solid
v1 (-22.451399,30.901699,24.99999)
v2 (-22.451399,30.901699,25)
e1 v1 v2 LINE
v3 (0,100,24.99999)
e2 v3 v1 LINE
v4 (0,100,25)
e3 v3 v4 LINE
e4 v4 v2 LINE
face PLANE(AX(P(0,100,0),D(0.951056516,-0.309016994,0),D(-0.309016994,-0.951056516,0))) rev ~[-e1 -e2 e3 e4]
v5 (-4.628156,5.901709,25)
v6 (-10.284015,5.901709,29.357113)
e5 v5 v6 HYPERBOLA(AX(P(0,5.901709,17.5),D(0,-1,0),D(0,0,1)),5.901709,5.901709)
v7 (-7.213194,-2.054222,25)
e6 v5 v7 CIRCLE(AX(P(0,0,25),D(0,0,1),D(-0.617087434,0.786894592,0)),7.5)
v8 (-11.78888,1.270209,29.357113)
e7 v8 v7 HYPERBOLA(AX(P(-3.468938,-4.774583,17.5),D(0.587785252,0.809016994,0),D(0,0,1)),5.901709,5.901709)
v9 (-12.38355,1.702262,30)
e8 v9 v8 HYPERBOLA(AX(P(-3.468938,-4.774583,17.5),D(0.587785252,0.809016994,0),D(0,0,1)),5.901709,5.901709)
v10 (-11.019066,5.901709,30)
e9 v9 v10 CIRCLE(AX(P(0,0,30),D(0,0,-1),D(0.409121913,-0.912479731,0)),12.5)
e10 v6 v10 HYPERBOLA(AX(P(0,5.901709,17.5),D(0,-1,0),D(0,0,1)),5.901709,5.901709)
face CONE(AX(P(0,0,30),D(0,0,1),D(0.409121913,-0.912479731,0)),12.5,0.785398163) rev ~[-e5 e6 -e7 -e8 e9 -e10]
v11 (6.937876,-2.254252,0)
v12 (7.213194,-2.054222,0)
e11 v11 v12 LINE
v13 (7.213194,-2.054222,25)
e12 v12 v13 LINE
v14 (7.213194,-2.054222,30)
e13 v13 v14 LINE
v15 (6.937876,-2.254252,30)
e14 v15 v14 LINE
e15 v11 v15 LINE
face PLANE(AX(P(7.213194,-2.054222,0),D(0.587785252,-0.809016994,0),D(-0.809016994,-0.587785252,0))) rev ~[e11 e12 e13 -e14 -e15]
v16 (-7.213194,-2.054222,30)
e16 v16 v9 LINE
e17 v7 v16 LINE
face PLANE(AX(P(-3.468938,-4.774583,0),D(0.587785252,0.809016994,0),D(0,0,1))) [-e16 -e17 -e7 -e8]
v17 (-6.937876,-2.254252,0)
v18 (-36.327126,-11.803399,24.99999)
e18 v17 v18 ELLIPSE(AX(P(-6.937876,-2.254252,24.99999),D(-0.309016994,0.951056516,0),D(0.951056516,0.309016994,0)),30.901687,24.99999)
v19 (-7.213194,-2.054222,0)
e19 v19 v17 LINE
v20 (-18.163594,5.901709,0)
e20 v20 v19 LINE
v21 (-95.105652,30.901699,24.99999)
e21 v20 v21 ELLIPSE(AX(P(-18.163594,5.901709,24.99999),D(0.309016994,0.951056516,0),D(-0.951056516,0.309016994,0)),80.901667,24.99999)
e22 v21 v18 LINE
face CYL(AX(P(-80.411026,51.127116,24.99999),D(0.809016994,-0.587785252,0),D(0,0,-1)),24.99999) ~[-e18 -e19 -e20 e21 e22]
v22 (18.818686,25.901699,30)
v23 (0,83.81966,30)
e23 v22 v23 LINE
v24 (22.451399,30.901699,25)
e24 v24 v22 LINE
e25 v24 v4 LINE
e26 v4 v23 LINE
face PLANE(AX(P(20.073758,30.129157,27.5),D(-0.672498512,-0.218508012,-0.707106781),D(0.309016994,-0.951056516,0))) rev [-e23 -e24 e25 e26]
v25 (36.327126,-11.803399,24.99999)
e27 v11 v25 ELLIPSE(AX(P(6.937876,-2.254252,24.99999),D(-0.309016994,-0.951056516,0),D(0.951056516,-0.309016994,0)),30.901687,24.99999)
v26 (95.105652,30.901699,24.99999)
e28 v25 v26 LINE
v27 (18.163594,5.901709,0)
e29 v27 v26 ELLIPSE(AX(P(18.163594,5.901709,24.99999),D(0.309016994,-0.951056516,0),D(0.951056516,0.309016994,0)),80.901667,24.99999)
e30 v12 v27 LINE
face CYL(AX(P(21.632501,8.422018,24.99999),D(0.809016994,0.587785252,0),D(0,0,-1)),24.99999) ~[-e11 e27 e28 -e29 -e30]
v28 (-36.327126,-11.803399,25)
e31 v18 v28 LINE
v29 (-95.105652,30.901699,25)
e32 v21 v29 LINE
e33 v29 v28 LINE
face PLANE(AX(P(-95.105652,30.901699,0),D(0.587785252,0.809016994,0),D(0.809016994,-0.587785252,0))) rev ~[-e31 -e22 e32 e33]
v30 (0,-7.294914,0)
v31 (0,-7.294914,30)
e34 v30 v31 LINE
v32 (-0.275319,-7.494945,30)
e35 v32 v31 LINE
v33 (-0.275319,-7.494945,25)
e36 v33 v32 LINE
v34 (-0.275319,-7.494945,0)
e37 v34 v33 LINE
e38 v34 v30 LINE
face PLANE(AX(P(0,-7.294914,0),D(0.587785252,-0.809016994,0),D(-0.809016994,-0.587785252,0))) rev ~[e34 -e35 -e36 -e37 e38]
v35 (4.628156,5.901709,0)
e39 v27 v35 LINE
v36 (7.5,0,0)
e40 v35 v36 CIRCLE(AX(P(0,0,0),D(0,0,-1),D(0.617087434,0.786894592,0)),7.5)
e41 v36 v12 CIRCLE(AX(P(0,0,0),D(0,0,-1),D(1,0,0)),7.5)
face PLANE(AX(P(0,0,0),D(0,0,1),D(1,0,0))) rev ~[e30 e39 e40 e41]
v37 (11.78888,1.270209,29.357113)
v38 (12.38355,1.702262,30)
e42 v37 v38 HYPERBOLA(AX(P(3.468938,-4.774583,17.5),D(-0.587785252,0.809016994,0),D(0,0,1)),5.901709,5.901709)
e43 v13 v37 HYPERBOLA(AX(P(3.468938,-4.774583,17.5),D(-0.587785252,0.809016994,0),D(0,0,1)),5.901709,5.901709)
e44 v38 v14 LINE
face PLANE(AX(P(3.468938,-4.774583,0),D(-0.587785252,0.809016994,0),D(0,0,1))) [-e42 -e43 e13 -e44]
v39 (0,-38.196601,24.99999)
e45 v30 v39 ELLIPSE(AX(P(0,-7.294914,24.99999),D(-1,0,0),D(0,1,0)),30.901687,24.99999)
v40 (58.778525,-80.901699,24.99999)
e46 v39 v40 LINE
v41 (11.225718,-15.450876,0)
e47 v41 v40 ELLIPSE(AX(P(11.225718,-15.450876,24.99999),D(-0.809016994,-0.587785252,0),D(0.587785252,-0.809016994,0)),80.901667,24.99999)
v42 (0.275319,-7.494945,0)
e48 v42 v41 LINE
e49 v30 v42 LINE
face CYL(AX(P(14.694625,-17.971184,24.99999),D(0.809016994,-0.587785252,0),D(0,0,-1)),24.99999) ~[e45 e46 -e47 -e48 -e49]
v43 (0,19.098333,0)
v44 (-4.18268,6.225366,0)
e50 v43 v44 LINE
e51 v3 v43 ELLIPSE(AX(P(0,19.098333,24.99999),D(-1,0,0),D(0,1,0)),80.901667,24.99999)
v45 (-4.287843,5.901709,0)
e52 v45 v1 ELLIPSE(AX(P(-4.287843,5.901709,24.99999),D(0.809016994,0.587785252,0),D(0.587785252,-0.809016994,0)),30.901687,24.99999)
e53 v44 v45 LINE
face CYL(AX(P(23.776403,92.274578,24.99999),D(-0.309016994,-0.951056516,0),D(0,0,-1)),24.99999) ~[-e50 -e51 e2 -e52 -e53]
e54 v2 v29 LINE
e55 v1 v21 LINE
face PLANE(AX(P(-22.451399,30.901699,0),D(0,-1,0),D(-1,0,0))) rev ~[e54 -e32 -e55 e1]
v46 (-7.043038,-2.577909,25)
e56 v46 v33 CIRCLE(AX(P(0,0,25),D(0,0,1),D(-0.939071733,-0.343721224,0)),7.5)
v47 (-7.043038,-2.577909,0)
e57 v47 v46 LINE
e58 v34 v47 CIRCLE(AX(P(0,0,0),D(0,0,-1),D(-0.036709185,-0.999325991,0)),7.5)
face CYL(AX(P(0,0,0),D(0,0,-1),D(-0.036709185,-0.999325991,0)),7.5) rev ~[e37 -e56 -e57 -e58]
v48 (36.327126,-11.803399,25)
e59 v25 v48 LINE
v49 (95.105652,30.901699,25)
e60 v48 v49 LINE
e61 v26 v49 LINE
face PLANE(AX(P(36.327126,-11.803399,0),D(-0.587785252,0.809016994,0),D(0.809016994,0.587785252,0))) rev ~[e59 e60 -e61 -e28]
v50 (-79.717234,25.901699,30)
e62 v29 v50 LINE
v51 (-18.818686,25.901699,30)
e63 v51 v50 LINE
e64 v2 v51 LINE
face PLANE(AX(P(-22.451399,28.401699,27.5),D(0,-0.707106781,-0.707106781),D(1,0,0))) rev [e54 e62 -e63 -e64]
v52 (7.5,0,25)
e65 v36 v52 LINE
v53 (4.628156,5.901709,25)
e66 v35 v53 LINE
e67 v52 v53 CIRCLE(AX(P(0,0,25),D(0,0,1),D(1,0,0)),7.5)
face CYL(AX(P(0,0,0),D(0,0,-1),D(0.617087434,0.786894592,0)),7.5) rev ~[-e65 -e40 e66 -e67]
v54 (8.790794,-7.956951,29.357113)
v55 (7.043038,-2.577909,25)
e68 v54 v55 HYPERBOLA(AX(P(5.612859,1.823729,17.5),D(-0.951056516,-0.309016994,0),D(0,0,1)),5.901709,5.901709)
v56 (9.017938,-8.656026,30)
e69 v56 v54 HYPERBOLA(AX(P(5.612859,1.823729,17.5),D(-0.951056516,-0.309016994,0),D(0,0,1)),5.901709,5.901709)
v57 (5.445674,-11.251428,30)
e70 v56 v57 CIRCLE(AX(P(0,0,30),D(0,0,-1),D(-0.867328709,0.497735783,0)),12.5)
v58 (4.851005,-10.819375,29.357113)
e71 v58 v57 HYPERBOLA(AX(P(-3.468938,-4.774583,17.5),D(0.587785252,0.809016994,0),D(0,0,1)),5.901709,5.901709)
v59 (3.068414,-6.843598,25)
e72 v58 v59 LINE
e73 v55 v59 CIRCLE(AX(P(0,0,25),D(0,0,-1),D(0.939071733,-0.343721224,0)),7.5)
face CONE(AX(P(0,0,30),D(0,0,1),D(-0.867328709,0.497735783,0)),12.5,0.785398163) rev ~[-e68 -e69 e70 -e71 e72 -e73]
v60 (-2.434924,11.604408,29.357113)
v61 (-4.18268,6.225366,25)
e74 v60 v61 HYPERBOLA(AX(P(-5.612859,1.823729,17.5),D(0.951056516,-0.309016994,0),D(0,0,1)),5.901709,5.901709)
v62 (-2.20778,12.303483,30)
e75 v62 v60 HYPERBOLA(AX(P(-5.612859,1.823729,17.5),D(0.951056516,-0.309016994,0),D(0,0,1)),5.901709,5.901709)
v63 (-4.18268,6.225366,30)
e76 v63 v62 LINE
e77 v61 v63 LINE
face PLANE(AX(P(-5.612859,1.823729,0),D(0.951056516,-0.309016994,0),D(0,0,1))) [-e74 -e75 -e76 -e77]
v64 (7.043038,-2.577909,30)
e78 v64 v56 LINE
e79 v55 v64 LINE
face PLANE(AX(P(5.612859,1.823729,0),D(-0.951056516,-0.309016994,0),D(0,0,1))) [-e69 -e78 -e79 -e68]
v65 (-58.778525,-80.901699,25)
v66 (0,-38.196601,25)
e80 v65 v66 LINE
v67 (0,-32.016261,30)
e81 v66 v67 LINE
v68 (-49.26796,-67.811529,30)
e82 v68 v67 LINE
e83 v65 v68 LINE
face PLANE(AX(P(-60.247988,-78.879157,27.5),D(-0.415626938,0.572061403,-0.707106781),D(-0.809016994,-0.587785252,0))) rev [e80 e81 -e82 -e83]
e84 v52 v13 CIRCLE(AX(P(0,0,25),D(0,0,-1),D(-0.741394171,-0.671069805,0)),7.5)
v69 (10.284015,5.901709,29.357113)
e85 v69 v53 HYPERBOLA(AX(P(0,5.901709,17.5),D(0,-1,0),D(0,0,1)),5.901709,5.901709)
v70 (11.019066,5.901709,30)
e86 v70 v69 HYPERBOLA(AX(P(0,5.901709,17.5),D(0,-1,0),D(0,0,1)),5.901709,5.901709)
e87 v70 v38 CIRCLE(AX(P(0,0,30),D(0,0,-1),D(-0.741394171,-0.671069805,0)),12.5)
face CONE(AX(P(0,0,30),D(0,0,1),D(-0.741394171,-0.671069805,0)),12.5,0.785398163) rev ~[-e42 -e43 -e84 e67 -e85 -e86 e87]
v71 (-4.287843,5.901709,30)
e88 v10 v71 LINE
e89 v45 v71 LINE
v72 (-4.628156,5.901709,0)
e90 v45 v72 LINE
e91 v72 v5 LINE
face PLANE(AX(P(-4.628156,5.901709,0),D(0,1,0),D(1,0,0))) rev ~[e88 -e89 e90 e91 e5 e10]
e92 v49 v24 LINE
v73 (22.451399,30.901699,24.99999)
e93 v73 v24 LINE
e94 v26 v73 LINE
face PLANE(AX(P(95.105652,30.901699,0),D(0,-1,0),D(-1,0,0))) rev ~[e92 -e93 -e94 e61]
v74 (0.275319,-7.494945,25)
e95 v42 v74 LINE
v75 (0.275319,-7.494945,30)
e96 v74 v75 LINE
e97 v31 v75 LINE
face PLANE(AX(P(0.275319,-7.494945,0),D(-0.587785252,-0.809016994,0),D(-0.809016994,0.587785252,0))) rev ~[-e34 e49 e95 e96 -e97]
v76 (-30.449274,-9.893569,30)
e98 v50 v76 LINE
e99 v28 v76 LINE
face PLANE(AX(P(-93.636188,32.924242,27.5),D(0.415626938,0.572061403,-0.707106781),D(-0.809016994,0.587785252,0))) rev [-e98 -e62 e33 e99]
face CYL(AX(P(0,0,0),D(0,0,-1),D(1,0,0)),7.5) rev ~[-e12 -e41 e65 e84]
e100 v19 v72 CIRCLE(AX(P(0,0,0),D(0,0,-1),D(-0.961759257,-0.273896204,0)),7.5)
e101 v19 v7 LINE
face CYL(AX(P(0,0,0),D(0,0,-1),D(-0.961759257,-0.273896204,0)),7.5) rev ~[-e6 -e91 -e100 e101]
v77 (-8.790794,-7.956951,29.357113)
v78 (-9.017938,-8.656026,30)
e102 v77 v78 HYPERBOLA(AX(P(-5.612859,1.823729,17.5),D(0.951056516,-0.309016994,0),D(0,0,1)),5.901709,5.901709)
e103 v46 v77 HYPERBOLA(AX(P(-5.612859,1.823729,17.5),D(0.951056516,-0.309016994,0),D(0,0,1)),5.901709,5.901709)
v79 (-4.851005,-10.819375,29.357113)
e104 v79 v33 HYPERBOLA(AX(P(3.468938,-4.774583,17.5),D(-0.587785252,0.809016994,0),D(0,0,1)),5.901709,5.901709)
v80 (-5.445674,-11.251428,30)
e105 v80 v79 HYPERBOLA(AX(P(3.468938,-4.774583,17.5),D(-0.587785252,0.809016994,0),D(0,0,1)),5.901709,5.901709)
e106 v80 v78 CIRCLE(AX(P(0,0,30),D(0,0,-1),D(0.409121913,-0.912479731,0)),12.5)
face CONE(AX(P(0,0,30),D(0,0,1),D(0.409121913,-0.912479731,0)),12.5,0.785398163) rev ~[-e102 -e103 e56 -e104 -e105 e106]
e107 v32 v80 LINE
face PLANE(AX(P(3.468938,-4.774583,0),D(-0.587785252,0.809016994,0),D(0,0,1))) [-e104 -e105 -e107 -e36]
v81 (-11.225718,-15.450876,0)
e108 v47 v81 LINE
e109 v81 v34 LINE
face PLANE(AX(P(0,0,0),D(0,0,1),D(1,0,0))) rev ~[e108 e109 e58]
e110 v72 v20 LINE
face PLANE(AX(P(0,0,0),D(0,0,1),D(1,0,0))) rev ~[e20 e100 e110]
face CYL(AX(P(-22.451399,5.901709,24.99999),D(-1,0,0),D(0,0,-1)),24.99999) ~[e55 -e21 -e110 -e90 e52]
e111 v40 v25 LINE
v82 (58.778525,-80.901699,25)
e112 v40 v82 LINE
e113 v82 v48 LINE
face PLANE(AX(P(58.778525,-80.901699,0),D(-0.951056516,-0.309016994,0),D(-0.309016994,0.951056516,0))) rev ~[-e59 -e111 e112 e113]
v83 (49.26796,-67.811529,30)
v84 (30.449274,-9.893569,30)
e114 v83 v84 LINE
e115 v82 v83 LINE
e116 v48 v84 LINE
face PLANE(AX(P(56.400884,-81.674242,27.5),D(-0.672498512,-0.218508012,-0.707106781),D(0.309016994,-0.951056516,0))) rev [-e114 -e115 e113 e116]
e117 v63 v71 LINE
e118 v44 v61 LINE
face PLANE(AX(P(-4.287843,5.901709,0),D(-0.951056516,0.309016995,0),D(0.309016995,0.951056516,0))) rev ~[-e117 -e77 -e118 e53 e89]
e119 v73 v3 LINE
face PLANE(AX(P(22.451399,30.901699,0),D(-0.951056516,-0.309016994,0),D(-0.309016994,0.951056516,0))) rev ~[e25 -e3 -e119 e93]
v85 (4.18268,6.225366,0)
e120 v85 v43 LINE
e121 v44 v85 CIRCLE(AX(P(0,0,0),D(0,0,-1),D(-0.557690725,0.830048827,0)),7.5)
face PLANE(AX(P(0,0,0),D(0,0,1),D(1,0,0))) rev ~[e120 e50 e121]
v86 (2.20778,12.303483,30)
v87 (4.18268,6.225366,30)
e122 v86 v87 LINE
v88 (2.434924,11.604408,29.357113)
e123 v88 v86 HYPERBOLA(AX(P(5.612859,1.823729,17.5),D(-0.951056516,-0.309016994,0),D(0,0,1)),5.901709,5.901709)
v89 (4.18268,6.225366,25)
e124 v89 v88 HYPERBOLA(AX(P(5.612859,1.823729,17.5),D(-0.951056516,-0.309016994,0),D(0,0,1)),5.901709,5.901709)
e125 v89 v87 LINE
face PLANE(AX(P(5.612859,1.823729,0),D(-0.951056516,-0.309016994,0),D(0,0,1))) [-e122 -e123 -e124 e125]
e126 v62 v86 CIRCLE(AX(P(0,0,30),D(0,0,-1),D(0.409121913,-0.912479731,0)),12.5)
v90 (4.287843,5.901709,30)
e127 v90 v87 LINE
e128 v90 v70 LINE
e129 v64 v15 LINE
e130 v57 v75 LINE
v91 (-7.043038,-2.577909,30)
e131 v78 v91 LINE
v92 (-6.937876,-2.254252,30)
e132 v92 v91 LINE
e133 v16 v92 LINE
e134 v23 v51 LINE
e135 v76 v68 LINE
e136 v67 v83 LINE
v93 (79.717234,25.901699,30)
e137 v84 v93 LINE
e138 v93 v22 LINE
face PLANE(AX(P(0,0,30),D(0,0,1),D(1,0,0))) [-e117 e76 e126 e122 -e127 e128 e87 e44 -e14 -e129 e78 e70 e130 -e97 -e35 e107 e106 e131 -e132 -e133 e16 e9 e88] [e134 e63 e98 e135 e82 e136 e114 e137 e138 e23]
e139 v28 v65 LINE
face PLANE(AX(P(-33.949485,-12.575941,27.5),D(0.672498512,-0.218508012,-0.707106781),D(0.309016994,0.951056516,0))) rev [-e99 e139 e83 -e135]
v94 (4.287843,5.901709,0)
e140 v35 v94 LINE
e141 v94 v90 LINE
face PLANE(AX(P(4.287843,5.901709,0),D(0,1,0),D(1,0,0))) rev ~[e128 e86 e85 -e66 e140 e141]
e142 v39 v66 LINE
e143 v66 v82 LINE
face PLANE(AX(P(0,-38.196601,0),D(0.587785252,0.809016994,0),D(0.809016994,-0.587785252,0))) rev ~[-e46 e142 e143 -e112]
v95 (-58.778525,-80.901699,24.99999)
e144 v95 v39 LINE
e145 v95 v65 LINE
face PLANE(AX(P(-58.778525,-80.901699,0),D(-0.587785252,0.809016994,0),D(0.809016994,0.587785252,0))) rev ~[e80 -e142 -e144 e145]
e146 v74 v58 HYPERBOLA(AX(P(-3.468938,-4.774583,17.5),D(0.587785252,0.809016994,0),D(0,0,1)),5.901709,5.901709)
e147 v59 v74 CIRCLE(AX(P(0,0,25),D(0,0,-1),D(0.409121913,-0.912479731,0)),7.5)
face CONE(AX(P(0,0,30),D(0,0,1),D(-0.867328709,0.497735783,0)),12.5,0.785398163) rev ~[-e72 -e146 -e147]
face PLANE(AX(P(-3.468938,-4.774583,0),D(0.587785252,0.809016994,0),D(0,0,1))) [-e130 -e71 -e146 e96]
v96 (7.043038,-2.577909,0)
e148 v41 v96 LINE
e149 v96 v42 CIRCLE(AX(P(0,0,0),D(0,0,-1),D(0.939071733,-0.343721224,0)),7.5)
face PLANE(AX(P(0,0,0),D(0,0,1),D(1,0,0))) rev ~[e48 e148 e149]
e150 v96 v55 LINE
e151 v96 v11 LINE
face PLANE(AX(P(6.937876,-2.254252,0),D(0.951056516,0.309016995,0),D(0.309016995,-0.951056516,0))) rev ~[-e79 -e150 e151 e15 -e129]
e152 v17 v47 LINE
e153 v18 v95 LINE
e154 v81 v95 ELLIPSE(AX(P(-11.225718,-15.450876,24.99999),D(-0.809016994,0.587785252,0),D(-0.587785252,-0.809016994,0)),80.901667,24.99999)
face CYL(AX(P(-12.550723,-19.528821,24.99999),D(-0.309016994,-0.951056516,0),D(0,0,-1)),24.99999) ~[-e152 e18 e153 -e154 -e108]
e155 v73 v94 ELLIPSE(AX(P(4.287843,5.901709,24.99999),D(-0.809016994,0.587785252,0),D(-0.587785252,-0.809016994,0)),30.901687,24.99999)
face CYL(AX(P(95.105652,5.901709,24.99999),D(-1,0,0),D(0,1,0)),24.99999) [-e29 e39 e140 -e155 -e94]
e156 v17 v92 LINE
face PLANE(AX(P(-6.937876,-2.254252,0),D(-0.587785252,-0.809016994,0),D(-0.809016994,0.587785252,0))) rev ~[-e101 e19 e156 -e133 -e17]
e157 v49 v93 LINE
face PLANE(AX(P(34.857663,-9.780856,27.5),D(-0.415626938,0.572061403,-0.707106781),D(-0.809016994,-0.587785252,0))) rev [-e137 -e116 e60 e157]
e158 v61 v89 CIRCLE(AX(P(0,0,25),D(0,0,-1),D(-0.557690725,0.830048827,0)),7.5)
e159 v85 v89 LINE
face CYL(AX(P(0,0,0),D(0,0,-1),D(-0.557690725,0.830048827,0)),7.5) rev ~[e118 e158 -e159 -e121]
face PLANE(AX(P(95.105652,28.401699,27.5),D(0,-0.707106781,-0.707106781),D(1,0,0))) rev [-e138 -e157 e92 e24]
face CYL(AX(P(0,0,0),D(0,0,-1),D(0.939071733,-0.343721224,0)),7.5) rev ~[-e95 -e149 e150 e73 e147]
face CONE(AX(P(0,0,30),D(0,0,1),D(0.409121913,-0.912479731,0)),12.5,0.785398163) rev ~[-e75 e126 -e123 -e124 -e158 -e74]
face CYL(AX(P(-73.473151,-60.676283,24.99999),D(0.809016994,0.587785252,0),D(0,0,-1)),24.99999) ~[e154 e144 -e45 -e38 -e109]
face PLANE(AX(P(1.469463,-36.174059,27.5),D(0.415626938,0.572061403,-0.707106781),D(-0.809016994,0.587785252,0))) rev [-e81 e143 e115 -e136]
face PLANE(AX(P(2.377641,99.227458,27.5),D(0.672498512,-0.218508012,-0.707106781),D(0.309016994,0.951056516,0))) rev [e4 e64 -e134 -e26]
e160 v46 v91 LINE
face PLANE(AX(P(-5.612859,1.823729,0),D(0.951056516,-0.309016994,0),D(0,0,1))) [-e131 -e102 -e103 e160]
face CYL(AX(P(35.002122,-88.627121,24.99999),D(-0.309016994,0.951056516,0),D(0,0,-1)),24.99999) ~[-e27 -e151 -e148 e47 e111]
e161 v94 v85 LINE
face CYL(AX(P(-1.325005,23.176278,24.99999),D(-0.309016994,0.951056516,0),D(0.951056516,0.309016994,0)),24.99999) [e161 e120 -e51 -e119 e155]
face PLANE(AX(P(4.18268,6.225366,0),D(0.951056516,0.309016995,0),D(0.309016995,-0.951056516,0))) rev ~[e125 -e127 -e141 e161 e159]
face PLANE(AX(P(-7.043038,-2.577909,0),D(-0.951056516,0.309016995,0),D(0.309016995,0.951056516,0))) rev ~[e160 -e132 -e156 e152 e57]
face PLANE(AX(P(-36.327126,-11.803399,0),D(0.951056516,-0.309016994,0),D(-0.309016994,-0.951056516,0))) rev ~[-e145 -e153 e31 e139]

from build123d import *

# Parameters (mm, degrees)
F1_DEPTH     = 30
F2_SIZE      = 5
F3_R         = 24.99999
F5_DEPTH     = 35
F6_T4_ANGLE  = 264.2993733481
F6_T11_ANGLE = 264.2993733481
F6_T18_ANGLE = 264.2993733481
F6_T24_ANGLE = 264.2993733481
F6_T30_ANGLE = 264.2993733481
F6_T37_ANGLE = 264.2993733481
F6_T44_ANGLE = 264.2993733481
F6_T51_ANGLE = 264.2993733481
F6_T57_ANGLE = 264.2993733481
F6_T63_ANGLE = 264.2993733481
F6_T70_ANGLE = 264.299373348
F6_T77_ANGLE = 264.299373348
F6_T84_ANGLE = 264.299373348


# Not quite as in the source:
# - a fillet or chamfer that OpenCascade refuses, or shapes differently, is made with other operations: its cross-section is extruded or revolved along the edge and cut away or added
# - a fillet or chamfer is up to 0.001 mm smaller than in the source, because OpenCascade refuses the exact size


with BuildPart() as f1:
    # F0 (on Top) → F1 (new body)
    with BuildSketch(Plane.XY):
        Polygon((22.451398829, 30.9016994375), (0, 100), (-22.451398829, 30.9016994375), (-95.1056516295, 30.9016994375), (-36.3271264003, -11.803398875), (-58.7785252292, -80.9016994375), (0, -38.196601125), (58.7785252292, -80.9016994375), (36.3271264003, -11.803398875), (95.1056516295, 30.9016994375), align=None)
    extrude(amount=F1_DEPTH)

    # F2
    f2_edges = [f1.edges().sort_by_distance(p)[0] for p in [
        (65.716389, 9.54915, 30),
        (58.778525, 30.901699, 30),
        (11.225699, 65.45085, 30),
        (-11.225699, 65.45085, 30),
        (-58.778525, 30.901699, 30),
        (-65.716389, 9.54915, 30),
        (-47.552826, -46.352549, 30),
        (-29.389263, -59.54915, 30),
        (29.389263, -59.54915, 30),
        (47.552826, -46.352549, 30),
    ]]
    chamfer(f2_edges, length=F2_SIZE)

    # F3 (radius 25 in the source; OpenCascade refuses exactly that, so slightly less here)
    f3_edges = [f1.edges().sort_by_distance(p)[0] for p in [
        (65.716389, 9.54915, 0),
        (58.778525, 30.901699, 0),
        (11.225699, 65.45085, 0),
        (-11.225699, 65.45085, 0),
        (-58.778525, 30.901699, 0),
        (-65.716389, 9.54915, 0),
        (-47.552826, -46.352549, 0),
        (-29.389263, -59.54915, 0),
        (29.389263, -59.54915, 0),
        (47.552826, -46.352549, 0),
    ]]
    fillet(f3_edges, radius=F3_R)

    # F4 (on face) → F5 (cut)
    with BuildSketch(Plane(origin=(0, 0, 0), x_dir=(1, 0, 0), z_dir=(0, 0, -1))):
        with BuildLine():
            ThreePointArc((4.6281557575, -5.9017094375), (6.7439294251, -3.2816788249), (7.5, 0))
            ThreePointArc((7.5, 0), (7.4279525521, 1.0370732295), (7.2131944311, 2.0542215312))
            Line((7.2131944311, 2.0542215312), (6.9378755413, 2.2542524134))
            Line((6.9378755413, 2.2542524134), (7.0430379995, 2.5779091795))
            ThreePointArc((7.0430379995, 2.5779091795), (4.4083893922, 6.0676274578), (0.2753188897, 7.4949449303))
            Line((0.2753188897, 7.4949449303), (0, 7.2949140482))
            Line((0, 7.2949140482), (-0.2753188897, 7.4949449303))
            ThreePointArc((-0.2753188897, 7.4949449303), (-4.4083893922, 6.0676274578), (-7.0430379995, 2.5779091795))
            Line((-7.0430379995, 2.5779091795), (-6.9378755413, 2.2542524134))
            Line((-6.9378755413, 2.2542524134), (-7.2131944311, 2.0542215312))
            ThreePointArc((-7.2131944311, 2.0542215312), (-7.1329238722, -2.3176274578), (-4.6281557575, -5.9017094375))
            Line((-4.6281557575, -5.9017094375), (-4.2878428943, -5.9017094375))
            Line((-4.2878428943, -5.9017094375), (-4.1826804361, -6.2253662036))
            ThreePointArc((-4.1826804361, -6.2253662036), (0, -7.5), (4.1826804361, -6.2253662036))
            Line((4.1826804361, -6.2253662036), (4.2878428943, -5.9017094375))
            Line((4.2878428943, -5.9017094375), (4.6281557575, -5.9017094375))
        make_face()
    extrude(amount=-F5_DEPTH, mode=Mode.SUBTRACT)

    # F6: chamfer of 5 on 5 edges, made by hand


with BuildPart() as f6_tool2:
    # F6_s3 → F6_t4 (revolve)
    with BuildSketch(Plane(origin=(0, 0, 0), x_dir=(0, 0, 1), z_dir=(0.9124797315, 0.4091219129, 0))):
        Polygon((30, 12.5), (25, 7.5), (30, 7.5), align=None)
    revolve(axis=Axis((0, 0, 30), (0, 0, -1)), revolution_arc=F6_T4_ANGLE)

    split(bisect_by=Plane(origin=(-5.6128592178, 1.823728512, 0), x_dir=(0, 0, 1), z_dir=(0.9510565163, -0.3090169944, 0)), keep=Keep.TOP)

    split(bisect_by=Plane(origin=(-3.4689377707, -4.7745832308, 0), x_dir=(0, 0, 1), z_dir=(0.5877852523, 0.8090169944, 0)), keep=Keep.TOP)

    split(bisect_by=Plane(origin=(5.6128592178, 1.823728512, 0), x_dir=(0, 0, 1), z_dir=(-0.9510565163, -0.3090169944, 0)), keep=Keep.TOP)


with BuildPart() as f1_1:
    add(f1.part)

    # F6_t1: cut F6_tool2
    add(f6_tool2.part, mode=Mode.SUBTRACT)


with BuildPart() as f6_tool9:
    # F6_s10 → F6_t11 (revolve)
    with BuildSketch(Plane(origin=(0, 0, 0), x_dir=(0, 0, 1), z_dir=(0.9124797315, 0.4091219129, 0))):
        Polygon((30, 12.5), (25, 7.5), (30, 7.5), align=None)
    revolve(axis=Axis((0, 0, 30), (0, 0, -1)), revolution_arc=F6_T11_ANGLE)

    split(bisect_by=Plane.XZ.offset(-5.9017094375), keep=Keep.TOP)

    split(bisect_by=Plane(origin=(-5.6128592178, 1.823728512, 0), x_dir=(0, 0, 1), z_dir=(0.9510565163, -0.3090169944, 0)), keep=Keep.TOP)

    split(bisect_by=Plane(origin=(3.4689377707, -4.7745832308, 0), x_dir=(0, 0, 1), z_dir=(-0.5877852523, 0.8090169944, 0)), keep=Keep.TOP)


with BuildPart() as f1_2:
    add(f1_1.part)

    # F6_t8: cut F6_tool9
    add(f6_tool9.part, mode=Mode.SUBTRACT)


with BuildPart() as f6_tool16:
    # F6_s17 → F6_t18 (revolve)
    with BuildSketch(Plane(origin=(0, 0, 0), x_dir=(0, 0, 1), z_dir=(0.9124797315, 0.4091219129, 0))):
        Polygon((30, 12.5), (25, 7.5), (30, 7.5), align=None)
    revolve(axis=Axis((0, 0, 30), (0, 0, -1)), revolution_arc=F6_T18_ANGLE)

    split(bisect_by=Plane.XZ.offset(-5.9017094375), keep=Keep.TOP)

    split(bisect_by=Plane(origin=(-3.4689377707, -4.7745832308, 0), x_dir=(0, 0, 1), z_dir=(0.5877852523, 0.8090169944, 0)), keep=Keep.TOP)


with BuildPart() as f1_3:
    add(f1_2.part)

    # F6_t15: cut F6_tool16
    add(f6_tool16.part, mode=Mode.SUBTRACT)


with BuildPart() as f6_tool22:
    # F6_s23 → F6_t24 (revolve)
    with BuildSketch(Plane(origin=(0, 0, 0), x_dir=(0, 0, 1), z_dir=(0.6710698053, -0.7413941707, 0))):
        Polygon((30, 12.5), (25, 7.5), (30, 7.5), align=None)
    revolve(axis=Axis((0, 0, 30), (0, 0, -1)), revolution_arc=F6_T24_ANGLE)

    split(bisect_by=Plane(origin=(5.6128592178, 1.823728512, 0), x_dir=(0, 0, 1), z_dir=(-0.9510565163, -0.3090169944, 0)), keep=Keep.TOP)

    split(bisect_by=Plane(origin=(-5.6128592178, 1.823728512, 0), x_dir=(0, 0, 1), z_dir=(0.9510565163, -0.3090169944, 0)), keep=Keep.TOP)


with BuildPart() as f1_4:
    add(f1_3.part)

    # F6_t21: cut F6_tool22
    add(f6_tool22.part, mode=Mode.SUBTRACT)


with BuildPart() as f6_tool28:
    # F6_s29 → F6_t30 (revolve)
    with BuildSketch(Plane(origin=(0, 0, 0), x_dir=(0, 0, 1), z_dir=(0.6710698053, -0.7413941707, 0))):
        Polygon((30, 12.5), (25, 7.5), (30, 7.5), align=None)
    revolve(axis=Axis((0, 0, 30), (0, 0, -1)), revolution_arc=F6_T30_ANGLE)

    split(bisect_by=Plane(origin=(3.4689377707, -4.7745832308, 0), x_dir=(0, 0, 1), z_dir=(-0.5877852523, 0.8090169944, 0)), keep=Keep.TOP)

    split(bisect_by=Plane.XZ.offset(-5.9017094375), keep=Keep.TOP)

    split(bisect_by=Plane(origin=(-3.4689377707, -4.7745832308, 0), x_dir=(0, 0, 1), z_dir=(0.5877852523, 0.8090169944, 0)), keep=Keep.TOP)


with BuildPart() as f1_5:
    add(f1_4.part)

    # F6_t27: cut F6_tool28
    add(f6_tool28.part, mode=Mode.SUBTRACT)


with BuildPart() as f6_tool35:
    # F6_s36 → F6_t37 (revolve)
    with BuildSketch(Plane(origin=(0, 0, 0), x_dir=(0, 0, 1), z_dir=(-0.497735783, -0.8673287095, 0))):
        Polygon((30, 12.5), (25, 7.5), (30, 7.5), align=None)
    revolve(axis=Axis((0, 0, 30), (0, 0, -1)), revolution_arc=F6_T37_ANGLE)

    split(bisect_by=Plane(origin=(5.6128592178, 1.823728512, 0), x_dir=(0, 0, 1), z_dir=(-0.9510565163, -0.3090169944, 0)), keep=Keep.TOP)

    split(bisect_by=Plane.XZ.offset(-5.9017094375), keep=Keep.TOP)

    split(bisect_by=Plane(origin=(-3.4689377707, -4.7745832308, 0), x_dir=(0, 0, 1), z_dir=(0.5877852523, 0.8090169944, 0)), keep=Keep.TOP)


with BuildPart() as f1_6:
    add(f1_5.part)

    # F6_t34: cut F6_tool35
    add(f6_tool35.part, mode=Mode.SUBTRACT)


with BuildPart() as f6_tool42:
    # F6_s43 → F6_t44 (revolve)
    with BuildSketch(Plane(origin=(0, 0, 0), x_dir=(0, 0, 1), z_dir=(-0.497735783, -0.8673287095, 0))):
        Polygon((30, 12.5), (25, 7.5), (30, 7.5), align=None)
    revolve(axis=Axis((0, 0, 30), (0, 0, -1)), revolution_arc=F6_T44_ANGLE)

    split(bisect_by=Plane(origin=(3.4689377707, -4.7745832308, 0), x_dir=(0, 0, 1), z_dir=(-0.5877852523, 0.8090169944, 0)), keep=Keep.TOP)

    split(bisect_by=Plane(origin=(5.6128592178, 1.823728512, 0), x_dir=(0, 0, 1), z_dir=(-0.9510565163, -0.3090169944, 0)), keep=Keep.TOP)

    split(bisect_by=Plane(origin=(-5.6128592178, 1.823728512, 0), x_dir=(0, 0, 1), z_dir=(0.9510565163, -0.3090169944, 0)), keep=Keep.TOP)


with BuildPart() as f1_7:
    add(f1_6.part)

    # F6_t41: cut F6_tool42
    add(f6_tool42.part, mode=Mode.SUBTRACT)


with BuildPart() as f6_tool49:
    # F6_s50 → F6_t51 (revolve)
    with BuildSketch(Plane(origin=(0, 0, 0), x_dir=(0, 0, 1), z_dir=(-0.497735783, -0.8673287095, 0))):
        Polygon((30, 12.5), (25, 7.5), (30, 7.5), align=None)
    revolve(axis=Axis((0, 0, 30), (0, 0, -1)), revolution_arc=F6_T51_ANGLE)

    split(bisect_by=Plane(origin=(3.4689377707, -4.7745832308, 0), x_dir=(0, 0, 1), z_dir=(-0.5877852523, 0.8090169944, 0)), keep=Keep.TOP)

    split(bisect_by=Plane.XZ.offset(-5.9017094375), keep=Keep.TOP)


with BuildPart() as f1_8:
    add(f1_7.part)

    # F6_t48: cut F6_tool49
    add(f6_tool49.part, mode=Mode.SUBTRACT)


with BuildPart() as f6_tool55:
    # F6_s56 → F6_t57 (revolve)
    with BuildSketch(Plane(origin=(0, 0, 0), x_dir=(0, 0, 1), z_dir=(-0.9786874366, 0.2053555488, 0))):
        Polygon((30, 12.5), (25, 7.5), (30, 7.5), align=None)
    revolve(axis=Axis((0, 0, 30), (0, 0, -1)), revolution_arc=F6_T57_ANGLE)

    split(bisect_by=Plane(origin=(5.6128592178, 1.823728512, 0), x_dir=(0, 0, 1), z_dir=(-0.9510565163, -0.3090169944, 0)), keep=Keep.TOP)

    split(bisect_by=Plane(origin=(-3.4689377707, -4.7745832308, 0), x_dir=(0, 0, 1), z_dir=(0.5877852523, 0.8090169944, 0)), keep=Keep.TOP)


with BuildPart() as f1_9:
    add(f1_8.part)

    # F6_t54: cut F6_tool55
    add(f6_tool55.part, mode=Mode.SUBTRACT)


with BuildPart() as f6_tool61:
    # F6_s62 → F6_t63 (revolve)
    with BuildSketch(Plane(origin=(0, 0, 0), x_dir=(0, 0, 1), z_dir=(-0.9786874366, 0.2053555488, 0))):
        Polygon((30, 12.5), (25, 7.5), (30, 7.5), align=None)
    revolve(axis=Axis((0, 0, 30), (0, 0, -1)), revolution_arc=F6_T63_ANGLE)

    split(bisect_by=Plane(origin=(3.4689377707, -4.7745832308, 0), x_dir=(0, 0, 1), z_dir=(-0.5877852523, 0.8090169944, 0)), keep=Keep.TOP)

    split(bisect_by=Plane.XZ.offset(-5.9017094375), keep=Keep.TOP)

    split(bisect_by=Plane(origin=(-5.6128592178, 1.823728512, 0), x_dir=(0, 0, 1), z_dir=(0.9510565163, -0.3090169944, 0)), keep=Keep.TOP)


with BuildPart() as f1_10:
    add(f1_9.part)

    # F6_t60: cut F6_tool61
    add(f6_tool61.part, mode=Mode.SUBTRACT)


with BuildPart() as f6_tool68:
    # F6_s69 → F6_t70 (revolve)
    with BuildSketch(Plane(origin=(0, 0, 0), x_dir=(0, 0, 1), z_dir=(-0.1071263172, 0.9942454185, 0))):
        Polygon((30, 12.5), (25, 7.5), (30, 7.5), align=None)
    revolve(axis=Axis((0, 0, 30), (0, 0, -1)), revolution_arc=F6_T70_ANGLE)

    split(bisect_by=Plane(origin=(3.4689377707, -4.7745832308, 0), x_dir=(0, 0, 1), z_dir=(-0.5877852523, 0.8090169944, 0)), keep=Keep.TOP)

    split(bisect_by=Plane(origin=(-3.4689377707, -4.7745832308, 0), x_dir=(0, 0, 1), z_dir=(0.5877852523, 0.8090169944, 0)), keep=Keep.TOP)

    split(bisect_by=Plane.XZ.offset(-5.9017094375), keep=Keep.TOP)


with BuildPart() as f1_11:
    add(f1_10.part)

    # F6_t67: cut F6_tool68
    add(f6_tool68.part, mode=Mode.SUBTRACT)


with BuildPart() as f6_tool75:
    # F6_s76 → F6_t77 (revolve)
    with BuildSketch(Plane(origin=(0, 0, 0), x_dir=(0, 0, 1), z_dir=(-0.1071263172, 0.9942454185, 0))):
        Polygon((30, 12.5), (25, 7.5), (30, 7.5), align=None)
    revolve(axis=Axis((0, 0, 30), (0, 0, -1)), revolution_arc=F6_T77_ANGLE)

    split(bisect_by=Plane(origin=(5.6128592178, 1.823728512, 0), x_dir=(0, 0, 1), z_dir=(-0.9510565163, -0.3090169944, 0)), keep=Keep.TOP)

    split(bisect_by=Plane(origin=(-5.6128592178, 1.823728512, 0), x_dir=(0, 0, 1), z_dir=(0.9510565163, -0.3090169944, 0)), keep=Keep.TOP)

    split(bisect_by=Plane(origin=(-3.4689377707, -4.7745832308, 0), x_dir=(0, 0, 1), z_dir=(0.5877852523, 0.8090169944, 0)), keep=Keep.TOP)


with BuildPart() as f1_12:
    add(f1_11.part)

    # F6_t74: cut F6_tool75
    add(f6_tool75.part, mode=Mode.SUBTRACT)


with BuildPart() as f6_tool82:
    # F6_s83 → F6_t84 (revolve)
    with BuildSketch(Plane(origin=(0, 0, 0), x_dir=(0, 0, 1), z_dir=(-0.1071263172, 0.9942454185, 0))):
        Polygon((30, 12.5), (25, 7.5), (30, 7.5), align=None)
    revolve(axis=Axis((0, 0, 30), (0, 0, -1)), revolution_arc=F6_T84_ANGLE)

    split(bisect_by=Plane(origin=(3.4689377707, -4.7745832308, 0), x_dir=(0, 0, 1), z_dir=(-0.5877852523, 0.8090169944, 0)), keep=Keep.TOP)

    split(bisect_by=Plane(origin=(-5.6128592178, 1.823728512, 0), x_dir=(0, 0, 1), z_dir=(0.9510565163, -0.3090169944, 0)), keep=Keep.TOP)


with BuildPart() as f1_13:
    add(f1_12.part)

    # F6_t81: cut F6_tool82
    add(f6_tool82.part, mode=Mode.SUBTRACT)


solid = f1_13.part
